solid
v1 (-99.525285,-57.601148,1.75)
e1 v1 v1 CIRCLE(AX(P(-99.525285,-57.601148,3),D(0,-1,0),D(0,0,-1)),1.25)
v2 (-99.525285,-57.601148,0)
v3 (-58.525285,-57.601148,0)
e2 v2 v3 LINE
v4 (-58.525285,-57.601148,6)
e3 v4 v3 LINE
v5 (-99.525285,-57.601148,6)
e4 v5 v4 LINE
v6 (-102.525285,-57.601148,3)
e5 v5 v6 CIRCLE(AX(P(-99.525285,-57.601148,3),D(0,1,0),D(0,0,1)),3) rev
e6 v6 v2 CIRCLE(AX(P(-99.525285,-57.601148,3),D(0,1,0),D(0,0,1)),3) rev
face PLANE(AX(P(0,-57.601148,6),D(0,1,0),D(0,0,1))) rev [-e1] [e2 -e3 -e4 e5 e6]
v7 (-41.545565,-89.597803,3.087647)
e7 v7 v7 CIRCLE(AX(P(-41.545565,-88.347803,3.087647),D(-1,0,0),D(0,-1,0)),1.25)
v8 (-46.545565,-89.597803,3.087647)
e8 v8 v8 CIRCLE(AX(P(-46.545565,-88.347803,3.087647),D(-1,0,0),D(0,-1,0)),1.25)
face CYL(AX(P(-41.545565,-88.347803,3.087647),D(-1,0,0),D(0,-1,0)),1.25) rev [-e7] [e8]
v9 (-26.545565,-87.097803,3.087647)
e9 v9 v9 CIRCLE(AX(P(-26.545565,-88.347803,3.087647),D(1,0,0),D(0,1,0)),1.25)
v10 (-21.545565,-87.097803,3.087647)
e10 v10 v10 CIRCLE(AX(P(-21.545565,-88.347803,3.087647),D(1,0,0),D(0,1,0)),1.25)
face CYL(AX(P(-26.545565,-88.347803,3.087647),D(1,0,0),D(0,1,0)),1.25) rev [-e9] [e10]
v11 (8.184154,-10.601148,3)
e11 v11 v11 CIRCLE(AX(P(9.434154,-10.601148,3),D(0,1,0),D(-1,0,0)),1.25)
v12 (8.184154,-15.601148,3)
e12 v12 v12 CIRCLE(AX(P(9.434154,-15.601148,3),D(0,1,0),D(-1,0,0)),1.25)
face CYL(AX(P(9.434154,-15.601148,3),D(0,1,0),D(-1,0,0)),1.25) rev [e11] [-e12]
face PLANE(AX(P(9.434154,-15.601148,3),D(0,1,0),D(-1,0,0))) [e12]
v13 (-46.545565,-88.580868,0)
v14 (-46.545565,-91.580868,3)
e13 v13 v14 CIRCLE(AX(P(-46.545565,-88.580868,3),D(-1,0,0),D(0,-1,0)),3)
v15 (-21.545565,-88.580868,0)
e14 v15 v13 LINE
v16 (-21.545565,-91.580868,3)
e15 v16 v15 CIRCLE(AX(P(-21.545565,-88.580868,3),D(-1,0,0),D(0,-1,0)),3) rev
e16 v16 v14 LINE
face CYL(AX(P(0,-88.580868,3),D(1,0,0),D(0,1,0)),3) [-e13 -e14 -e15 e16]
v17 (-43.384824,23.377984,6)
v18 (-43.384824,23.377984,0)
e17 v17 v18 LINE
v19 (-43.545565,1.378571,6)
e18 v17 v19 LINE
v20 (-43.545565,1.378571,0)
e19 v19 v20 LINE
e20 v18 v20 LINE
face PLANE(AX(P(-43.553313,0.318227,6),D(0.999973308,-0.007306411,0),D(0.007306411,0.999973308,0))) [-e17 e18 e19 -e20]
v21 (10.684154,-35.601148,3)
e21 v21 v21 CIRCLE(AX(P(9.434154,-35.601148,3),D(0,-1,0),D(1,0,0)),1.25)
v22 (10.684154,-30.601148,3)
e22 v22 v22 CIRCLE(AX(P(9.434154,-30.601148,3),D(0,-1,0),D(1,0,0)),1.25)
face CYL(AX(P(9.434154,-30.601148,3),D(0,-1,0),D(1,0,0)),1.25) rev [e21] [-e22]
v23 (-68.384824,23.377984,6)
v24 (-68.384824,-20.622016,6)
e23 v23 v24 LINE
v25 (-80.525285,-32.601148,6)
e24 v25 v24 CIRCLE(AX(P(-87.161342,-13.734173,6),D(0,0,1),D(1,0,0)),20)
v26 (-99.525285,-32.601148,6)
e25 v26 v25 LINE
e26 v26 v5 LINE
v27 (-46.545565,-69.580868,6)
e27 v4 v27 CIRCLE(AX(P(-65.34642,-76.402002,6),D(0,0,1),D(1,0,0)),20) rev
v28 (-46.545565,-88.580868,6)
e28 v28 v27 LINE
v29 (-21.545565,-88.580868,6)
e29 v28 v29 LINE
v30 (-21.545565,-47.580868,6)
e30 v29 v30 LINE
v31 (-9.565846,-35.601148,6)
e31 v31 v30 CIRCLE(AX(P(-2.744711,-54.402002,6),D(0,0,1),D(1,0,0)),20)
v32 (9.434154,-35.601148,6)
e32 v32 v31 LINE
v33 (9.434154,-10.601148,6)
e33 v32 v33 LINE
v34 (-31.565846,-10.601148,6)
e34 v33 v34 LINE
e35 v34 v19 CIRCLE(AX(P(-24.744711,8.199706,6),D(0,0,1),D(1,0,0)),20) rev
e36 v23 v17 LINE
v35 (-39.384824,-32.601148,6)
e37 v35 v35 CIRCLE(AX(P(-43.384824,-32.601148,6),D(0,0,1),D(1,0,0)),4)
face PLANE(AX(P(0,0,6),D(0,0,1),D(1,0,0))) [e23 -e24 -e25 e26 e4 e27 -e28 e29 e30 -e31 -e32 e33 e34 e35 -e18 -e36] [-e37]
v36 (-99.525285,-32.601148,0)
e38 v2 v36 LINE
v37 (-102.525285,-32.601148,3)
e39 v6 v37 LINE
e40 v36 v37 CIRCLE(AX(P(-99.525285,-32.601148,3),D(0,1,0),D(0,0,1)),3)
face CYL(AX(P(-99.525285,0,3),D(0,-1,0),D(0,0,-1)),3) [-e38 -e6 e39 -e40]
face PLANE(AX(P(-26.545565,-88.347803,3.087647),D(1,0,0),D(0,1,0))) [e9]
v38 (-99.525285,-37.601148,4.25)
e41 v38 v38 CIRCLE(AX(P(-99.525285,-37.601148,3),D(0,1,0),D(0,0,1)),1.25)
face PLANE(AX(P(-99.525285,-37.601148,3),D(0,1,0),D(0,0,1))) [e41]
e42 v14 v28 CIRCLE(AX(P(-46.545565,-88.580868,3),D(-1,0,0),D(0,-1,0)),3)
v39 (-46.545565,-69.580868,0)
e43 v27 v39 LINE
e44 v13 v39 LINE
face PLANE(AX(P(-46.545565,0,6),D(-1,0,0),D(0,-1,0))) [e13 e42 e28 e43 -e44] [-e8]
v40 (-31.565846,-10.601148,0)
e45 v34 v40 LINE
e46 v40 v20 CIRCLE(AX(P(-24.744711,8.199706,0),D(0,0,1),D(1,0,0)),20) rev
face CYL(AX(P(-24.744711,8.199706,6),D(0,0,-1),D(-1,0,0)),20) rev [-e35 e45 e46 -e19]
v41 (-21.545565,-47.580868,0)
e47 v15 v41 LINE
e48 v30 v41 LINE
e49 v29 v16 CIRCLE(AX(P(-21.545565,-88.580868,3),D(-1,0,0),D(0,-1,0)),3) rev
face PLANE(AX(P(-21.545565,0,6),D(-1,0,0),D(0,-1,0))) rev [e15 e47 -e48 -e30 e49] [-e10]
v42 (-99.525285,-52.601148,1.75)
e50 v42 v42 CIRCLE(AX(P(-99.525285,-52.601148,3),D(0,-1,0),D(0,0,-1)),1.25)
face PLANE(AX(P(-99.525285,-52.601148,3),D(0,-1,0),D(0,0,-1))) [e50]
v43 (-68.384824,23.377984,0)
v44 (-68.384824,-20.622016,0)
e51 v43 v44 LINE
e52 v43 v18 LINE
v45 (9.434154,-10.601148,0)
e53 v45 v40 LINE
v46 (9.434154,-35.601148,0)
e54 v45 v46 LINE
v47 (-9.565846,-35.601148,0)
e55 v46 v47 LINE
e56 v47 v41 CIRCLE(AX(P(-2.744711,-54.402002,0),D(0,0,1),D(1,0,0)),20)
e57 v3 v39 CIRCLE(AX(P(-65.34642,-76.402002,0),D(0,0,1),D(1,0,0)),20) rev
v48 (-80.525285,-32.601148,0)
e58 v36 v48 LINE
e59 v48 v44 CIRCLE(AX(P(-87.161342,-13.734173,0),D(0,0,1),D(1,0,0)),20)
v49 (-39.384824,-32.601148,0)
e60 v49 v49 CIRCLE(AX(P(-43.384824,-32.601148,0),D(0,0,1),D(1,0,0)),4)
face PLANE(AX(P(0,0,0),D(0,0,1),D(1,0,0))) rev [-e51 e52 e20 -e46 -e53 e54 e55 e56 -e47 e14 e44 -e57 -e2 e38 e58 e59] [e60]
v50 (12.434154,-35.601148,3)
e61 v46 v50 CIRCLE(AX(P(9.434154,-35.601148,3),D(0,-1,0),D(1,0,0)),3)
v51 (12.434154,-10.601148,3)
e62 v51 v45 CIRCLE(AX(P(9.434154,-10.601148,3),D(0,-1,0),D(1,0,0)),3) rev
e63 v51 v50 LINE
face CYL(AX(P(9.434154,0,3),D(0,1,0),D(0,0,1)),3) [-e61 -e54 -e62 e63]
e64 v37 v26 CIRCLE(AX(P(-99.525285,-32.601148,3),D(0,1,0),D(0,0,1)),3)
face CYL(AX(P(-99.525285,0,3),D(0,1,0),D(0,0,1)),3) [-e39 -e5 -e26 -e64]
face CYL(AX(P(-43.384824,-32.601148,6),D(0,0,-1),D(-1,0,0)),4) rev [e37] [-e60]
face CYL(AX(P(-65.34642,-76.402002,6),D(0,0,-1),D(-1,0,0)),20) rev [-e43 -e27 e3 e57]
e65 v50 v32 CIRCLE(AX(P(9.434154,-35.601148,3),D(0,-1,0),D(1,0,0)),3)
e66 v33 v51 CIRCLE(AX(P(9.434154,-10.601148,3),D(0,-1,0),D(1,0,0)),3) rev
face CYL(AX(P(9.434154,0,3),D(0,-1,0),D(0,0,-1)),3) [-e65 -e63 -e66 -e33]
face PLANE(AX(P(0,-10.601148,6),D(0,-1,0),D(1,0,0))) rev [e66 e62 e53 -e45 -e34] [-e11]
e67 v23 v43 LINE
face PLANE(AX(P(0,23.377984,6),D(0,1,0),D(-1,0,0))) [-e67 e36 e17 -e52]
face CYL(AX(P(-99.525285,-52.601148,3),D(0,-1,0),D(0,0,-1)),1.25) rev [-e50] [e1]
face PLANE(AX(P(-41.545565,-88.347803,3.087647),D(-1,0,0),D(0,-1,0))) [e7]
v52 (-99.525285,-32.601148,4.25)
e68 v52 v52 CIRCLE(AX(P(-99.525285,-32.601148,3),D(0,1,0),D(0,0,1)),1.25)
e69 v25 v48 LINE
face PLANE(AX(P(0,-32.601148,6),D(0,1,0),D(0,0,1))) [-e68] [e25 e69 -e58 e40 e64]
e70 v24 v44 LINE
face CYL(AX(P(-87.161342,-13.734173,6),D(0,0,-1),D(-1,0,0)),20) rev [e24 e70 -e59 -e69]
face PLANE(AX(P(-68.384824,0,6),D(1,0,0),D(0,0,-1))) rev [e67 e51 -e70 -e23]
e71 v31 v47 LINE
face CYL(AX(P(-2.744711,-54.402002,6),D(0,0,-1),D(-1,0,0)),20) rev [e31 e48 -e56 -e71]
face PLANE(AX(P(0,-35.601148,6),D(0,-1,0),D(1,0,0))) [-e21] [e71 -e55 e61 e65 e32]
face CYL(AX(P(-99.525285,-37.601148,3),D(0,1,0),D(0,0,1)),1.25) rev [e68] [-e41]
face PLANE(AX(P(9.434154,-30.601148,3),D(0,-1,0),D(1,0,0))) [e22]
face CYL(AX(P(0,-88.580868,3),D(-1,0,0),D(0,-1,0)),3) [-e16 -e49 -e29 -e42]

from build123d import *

# Parameters (mm, degrees)
SKETCH_2_R          = 4
EXTRUDE_1_DEPTH     = 6
SKETCH_3_R          = 1.25
CUT_EXTRUDE_1_DEPTH = 5
CUT_EXTRUDE_START   = -5
SKETCH_4_R          = 1.25
CUT_EXTRUDE_2_DEPTH = 5
SKETCH_5_R          = 1.25
CUT_EXTRUDE_3_DEPTH = 5
SKETCH_6_R          = 1.25
CUT_EXTRUDE_4_DEPTH = 5
SKETCH_8_R          = 1.25
CUT_EXTRUDE_5_DEPTH = 5
SKETCH_9_R          = 1.25
CUT_EXTRUDE_6_DEPTH = 5
FILLET_2_R          = 3


with BuildPart() as part:
    # 스케치2 → 보스-돌출1 (new body)
    with BuildSketch(Plane.XY):
        with BuildLine():
            Line((-102.525284978, -57.601148056), (-102.525284978, -32.601148056))
            Line((-102.525284978, -32.601148056), (-80.525284978, -32.601148056))
            ThreePointArc((-80.525284978, -32.601148056), (-73.11411316, -27.970582536), (-68.384824454, -20.622015799))
            Line((-68.384824454, -20.622015799), (-68.384824454, 23.377984201))
            Line((-68.384824454, 23.377984201), (-43.384824454, 23.377984201))
            Line((-43.384824454, 23.377984201), (-43.545565494, 1.378571429))
            ThreePointArc((-43.545565494, 1.378571429), (-38.886846868, -5.94242943), (-31.565846009, -10.601148056))
            Line((-31.565846009, -10.601148056), (12.434153991, -10.601148056))
            Line((12.434153991, -10.601148056), (12.434153991, -35.601148056))
            Line((12.434153991, -35.601148056), (-9.565846009, -35.601148056))
            ThreePointArc((-9.565846009, -35.601148056), (-16.886846868, -40.259866682), (-21.545565494, -47.580867541))
            Line((-21.545565494, -47.580867541), (-21.545565494, -91.580867541))
            Line((-21.545565494, -91.580867541), (-46.545565494, -91.580867541))
            Line((-46.545565494, -91.580867541), (-46.545565494, -69.580867541))
            ThreePointArc((-46.545565494, -69.580867541), (-51.20428412, -62.259866682), (-58.525284978, -57.601148056))
            Line((-58.525284978, -57.601148056), (-102.525284978, -57.601148056))
        make_face()
        with Locations((-43.384824454, -32.601148056)):
            Circle(SKETCH_2_R, mode=Mode.SUBTRACT)
    extrude(amount=EXTRUDE_1_DEPTH)

    # 스케치3 → 컷-돌출1 (cut)
    with BuildSketch(Plane(origin=(0, -57.601148056, 0), x_dir=(-1, 0, 0), z_dir=(0, -1, 0))):
        with Locations(Location((99.525284978, -3, 0), (0, 0, 90))):
            Circle(SKETCH_3_R)
    extrude(amount=-CUT_EXTRUDE_1_DEPTH, mode=Mode.SUBTRACT)

    # 스케치4 → 컷-돌출2 (cut)
    with BuildSketch(Plane(origin=(0, -32.601148056, 0), x_dir=(1, 0, 0), z_dir=(0, 1, 0)).offset(CUT_EXTRUDE_START)):
        with Locations(Location((-99.525284978, -3, 0), (0, 0, 90))):
            Circle(SKETCH_4_R)
    extrude(amount=CUT_EXTRUDE_2_DEPTH, mode=Mode.SUBTRACT)

    # 스케치5 → 컷-돌출3 (cut)
    with BuildSketch(Plane(origin=(-21.545565494, 0, 0), x_dir=(0, 0, -1), z_dir=(1, 0, 0))):
        with Locations(Location((-3.087647422, -88.347802665, 0), (0, 0, 90))):
            Circle(SKETCH_5_R)
    extrude(amount=-CUT_EXTRUDE_3_DEPTH, mode=Mode.SUBTRACT)

    # 스케치6 → 컷-돌출4 (cut)
    with BuildSketch(Plane.ZY.offset(46.545565494).offset(CUT_EXTRUDE_START)):
        with Locations(Location((3.087647422, -88.347802665, 0), (0, 0, 90))):
            Circle(SKETCH_6_R)
    extrude(amount=CUT_EXTRUDE_4_DEPTH, mode=Mode.SUBTRACT)

    # 스케치8 → 컷-돌출5 (cut)
    with BuildSketch(Plane(origin=(0, -10.601148056, 0), x_dir=(1, 0, 0), z_dir=(0, 1, 0))):
        with Locations(Location((9.434153991, -3, 0), (0, 0, 180))):
            Circle(SKETCH_8_R)
    extrude(amount=-CUT_EXTRUDE_5_DEPTH, mode=Mode.SUBTRACT)

    # 스케치9 → 컷-돌출6 (cut)
    with BuildSketch(Plane(origin=(0, -35.601148056, 0), x_dir=(-1, 0, 0), z_dir=(0, -1, 0)).offset(CUT_EXTRUDE_START)):
        with Locations((-9.434153991, -3)):
            Circle(SKETCH_9_R)
    extrude(amount=CUT_EXTRUDE_6_DEPTH, mode=Mode.SUBTRACT)

    # 필렛2
    fillet_2_edges = [part.edges().sort_by_distance(p)[0] for p in [
        (12.434153991, -23.101148056, 0),
        (12.434153991, -23.101148056, 6),
        (-34.045565494, -91.580867541, 0),
        (-34.045565494, -91.580867541, 6),
        (-102.525284978, -45.101148056, 0),
        (-102.525284978, -45.101148056, 6),
    ]]
    fillet(fillet_2_edges, radius=FILLET_2_R - 0.0001)  # a hair under: the kernel refuses the full size


solid = part.part
